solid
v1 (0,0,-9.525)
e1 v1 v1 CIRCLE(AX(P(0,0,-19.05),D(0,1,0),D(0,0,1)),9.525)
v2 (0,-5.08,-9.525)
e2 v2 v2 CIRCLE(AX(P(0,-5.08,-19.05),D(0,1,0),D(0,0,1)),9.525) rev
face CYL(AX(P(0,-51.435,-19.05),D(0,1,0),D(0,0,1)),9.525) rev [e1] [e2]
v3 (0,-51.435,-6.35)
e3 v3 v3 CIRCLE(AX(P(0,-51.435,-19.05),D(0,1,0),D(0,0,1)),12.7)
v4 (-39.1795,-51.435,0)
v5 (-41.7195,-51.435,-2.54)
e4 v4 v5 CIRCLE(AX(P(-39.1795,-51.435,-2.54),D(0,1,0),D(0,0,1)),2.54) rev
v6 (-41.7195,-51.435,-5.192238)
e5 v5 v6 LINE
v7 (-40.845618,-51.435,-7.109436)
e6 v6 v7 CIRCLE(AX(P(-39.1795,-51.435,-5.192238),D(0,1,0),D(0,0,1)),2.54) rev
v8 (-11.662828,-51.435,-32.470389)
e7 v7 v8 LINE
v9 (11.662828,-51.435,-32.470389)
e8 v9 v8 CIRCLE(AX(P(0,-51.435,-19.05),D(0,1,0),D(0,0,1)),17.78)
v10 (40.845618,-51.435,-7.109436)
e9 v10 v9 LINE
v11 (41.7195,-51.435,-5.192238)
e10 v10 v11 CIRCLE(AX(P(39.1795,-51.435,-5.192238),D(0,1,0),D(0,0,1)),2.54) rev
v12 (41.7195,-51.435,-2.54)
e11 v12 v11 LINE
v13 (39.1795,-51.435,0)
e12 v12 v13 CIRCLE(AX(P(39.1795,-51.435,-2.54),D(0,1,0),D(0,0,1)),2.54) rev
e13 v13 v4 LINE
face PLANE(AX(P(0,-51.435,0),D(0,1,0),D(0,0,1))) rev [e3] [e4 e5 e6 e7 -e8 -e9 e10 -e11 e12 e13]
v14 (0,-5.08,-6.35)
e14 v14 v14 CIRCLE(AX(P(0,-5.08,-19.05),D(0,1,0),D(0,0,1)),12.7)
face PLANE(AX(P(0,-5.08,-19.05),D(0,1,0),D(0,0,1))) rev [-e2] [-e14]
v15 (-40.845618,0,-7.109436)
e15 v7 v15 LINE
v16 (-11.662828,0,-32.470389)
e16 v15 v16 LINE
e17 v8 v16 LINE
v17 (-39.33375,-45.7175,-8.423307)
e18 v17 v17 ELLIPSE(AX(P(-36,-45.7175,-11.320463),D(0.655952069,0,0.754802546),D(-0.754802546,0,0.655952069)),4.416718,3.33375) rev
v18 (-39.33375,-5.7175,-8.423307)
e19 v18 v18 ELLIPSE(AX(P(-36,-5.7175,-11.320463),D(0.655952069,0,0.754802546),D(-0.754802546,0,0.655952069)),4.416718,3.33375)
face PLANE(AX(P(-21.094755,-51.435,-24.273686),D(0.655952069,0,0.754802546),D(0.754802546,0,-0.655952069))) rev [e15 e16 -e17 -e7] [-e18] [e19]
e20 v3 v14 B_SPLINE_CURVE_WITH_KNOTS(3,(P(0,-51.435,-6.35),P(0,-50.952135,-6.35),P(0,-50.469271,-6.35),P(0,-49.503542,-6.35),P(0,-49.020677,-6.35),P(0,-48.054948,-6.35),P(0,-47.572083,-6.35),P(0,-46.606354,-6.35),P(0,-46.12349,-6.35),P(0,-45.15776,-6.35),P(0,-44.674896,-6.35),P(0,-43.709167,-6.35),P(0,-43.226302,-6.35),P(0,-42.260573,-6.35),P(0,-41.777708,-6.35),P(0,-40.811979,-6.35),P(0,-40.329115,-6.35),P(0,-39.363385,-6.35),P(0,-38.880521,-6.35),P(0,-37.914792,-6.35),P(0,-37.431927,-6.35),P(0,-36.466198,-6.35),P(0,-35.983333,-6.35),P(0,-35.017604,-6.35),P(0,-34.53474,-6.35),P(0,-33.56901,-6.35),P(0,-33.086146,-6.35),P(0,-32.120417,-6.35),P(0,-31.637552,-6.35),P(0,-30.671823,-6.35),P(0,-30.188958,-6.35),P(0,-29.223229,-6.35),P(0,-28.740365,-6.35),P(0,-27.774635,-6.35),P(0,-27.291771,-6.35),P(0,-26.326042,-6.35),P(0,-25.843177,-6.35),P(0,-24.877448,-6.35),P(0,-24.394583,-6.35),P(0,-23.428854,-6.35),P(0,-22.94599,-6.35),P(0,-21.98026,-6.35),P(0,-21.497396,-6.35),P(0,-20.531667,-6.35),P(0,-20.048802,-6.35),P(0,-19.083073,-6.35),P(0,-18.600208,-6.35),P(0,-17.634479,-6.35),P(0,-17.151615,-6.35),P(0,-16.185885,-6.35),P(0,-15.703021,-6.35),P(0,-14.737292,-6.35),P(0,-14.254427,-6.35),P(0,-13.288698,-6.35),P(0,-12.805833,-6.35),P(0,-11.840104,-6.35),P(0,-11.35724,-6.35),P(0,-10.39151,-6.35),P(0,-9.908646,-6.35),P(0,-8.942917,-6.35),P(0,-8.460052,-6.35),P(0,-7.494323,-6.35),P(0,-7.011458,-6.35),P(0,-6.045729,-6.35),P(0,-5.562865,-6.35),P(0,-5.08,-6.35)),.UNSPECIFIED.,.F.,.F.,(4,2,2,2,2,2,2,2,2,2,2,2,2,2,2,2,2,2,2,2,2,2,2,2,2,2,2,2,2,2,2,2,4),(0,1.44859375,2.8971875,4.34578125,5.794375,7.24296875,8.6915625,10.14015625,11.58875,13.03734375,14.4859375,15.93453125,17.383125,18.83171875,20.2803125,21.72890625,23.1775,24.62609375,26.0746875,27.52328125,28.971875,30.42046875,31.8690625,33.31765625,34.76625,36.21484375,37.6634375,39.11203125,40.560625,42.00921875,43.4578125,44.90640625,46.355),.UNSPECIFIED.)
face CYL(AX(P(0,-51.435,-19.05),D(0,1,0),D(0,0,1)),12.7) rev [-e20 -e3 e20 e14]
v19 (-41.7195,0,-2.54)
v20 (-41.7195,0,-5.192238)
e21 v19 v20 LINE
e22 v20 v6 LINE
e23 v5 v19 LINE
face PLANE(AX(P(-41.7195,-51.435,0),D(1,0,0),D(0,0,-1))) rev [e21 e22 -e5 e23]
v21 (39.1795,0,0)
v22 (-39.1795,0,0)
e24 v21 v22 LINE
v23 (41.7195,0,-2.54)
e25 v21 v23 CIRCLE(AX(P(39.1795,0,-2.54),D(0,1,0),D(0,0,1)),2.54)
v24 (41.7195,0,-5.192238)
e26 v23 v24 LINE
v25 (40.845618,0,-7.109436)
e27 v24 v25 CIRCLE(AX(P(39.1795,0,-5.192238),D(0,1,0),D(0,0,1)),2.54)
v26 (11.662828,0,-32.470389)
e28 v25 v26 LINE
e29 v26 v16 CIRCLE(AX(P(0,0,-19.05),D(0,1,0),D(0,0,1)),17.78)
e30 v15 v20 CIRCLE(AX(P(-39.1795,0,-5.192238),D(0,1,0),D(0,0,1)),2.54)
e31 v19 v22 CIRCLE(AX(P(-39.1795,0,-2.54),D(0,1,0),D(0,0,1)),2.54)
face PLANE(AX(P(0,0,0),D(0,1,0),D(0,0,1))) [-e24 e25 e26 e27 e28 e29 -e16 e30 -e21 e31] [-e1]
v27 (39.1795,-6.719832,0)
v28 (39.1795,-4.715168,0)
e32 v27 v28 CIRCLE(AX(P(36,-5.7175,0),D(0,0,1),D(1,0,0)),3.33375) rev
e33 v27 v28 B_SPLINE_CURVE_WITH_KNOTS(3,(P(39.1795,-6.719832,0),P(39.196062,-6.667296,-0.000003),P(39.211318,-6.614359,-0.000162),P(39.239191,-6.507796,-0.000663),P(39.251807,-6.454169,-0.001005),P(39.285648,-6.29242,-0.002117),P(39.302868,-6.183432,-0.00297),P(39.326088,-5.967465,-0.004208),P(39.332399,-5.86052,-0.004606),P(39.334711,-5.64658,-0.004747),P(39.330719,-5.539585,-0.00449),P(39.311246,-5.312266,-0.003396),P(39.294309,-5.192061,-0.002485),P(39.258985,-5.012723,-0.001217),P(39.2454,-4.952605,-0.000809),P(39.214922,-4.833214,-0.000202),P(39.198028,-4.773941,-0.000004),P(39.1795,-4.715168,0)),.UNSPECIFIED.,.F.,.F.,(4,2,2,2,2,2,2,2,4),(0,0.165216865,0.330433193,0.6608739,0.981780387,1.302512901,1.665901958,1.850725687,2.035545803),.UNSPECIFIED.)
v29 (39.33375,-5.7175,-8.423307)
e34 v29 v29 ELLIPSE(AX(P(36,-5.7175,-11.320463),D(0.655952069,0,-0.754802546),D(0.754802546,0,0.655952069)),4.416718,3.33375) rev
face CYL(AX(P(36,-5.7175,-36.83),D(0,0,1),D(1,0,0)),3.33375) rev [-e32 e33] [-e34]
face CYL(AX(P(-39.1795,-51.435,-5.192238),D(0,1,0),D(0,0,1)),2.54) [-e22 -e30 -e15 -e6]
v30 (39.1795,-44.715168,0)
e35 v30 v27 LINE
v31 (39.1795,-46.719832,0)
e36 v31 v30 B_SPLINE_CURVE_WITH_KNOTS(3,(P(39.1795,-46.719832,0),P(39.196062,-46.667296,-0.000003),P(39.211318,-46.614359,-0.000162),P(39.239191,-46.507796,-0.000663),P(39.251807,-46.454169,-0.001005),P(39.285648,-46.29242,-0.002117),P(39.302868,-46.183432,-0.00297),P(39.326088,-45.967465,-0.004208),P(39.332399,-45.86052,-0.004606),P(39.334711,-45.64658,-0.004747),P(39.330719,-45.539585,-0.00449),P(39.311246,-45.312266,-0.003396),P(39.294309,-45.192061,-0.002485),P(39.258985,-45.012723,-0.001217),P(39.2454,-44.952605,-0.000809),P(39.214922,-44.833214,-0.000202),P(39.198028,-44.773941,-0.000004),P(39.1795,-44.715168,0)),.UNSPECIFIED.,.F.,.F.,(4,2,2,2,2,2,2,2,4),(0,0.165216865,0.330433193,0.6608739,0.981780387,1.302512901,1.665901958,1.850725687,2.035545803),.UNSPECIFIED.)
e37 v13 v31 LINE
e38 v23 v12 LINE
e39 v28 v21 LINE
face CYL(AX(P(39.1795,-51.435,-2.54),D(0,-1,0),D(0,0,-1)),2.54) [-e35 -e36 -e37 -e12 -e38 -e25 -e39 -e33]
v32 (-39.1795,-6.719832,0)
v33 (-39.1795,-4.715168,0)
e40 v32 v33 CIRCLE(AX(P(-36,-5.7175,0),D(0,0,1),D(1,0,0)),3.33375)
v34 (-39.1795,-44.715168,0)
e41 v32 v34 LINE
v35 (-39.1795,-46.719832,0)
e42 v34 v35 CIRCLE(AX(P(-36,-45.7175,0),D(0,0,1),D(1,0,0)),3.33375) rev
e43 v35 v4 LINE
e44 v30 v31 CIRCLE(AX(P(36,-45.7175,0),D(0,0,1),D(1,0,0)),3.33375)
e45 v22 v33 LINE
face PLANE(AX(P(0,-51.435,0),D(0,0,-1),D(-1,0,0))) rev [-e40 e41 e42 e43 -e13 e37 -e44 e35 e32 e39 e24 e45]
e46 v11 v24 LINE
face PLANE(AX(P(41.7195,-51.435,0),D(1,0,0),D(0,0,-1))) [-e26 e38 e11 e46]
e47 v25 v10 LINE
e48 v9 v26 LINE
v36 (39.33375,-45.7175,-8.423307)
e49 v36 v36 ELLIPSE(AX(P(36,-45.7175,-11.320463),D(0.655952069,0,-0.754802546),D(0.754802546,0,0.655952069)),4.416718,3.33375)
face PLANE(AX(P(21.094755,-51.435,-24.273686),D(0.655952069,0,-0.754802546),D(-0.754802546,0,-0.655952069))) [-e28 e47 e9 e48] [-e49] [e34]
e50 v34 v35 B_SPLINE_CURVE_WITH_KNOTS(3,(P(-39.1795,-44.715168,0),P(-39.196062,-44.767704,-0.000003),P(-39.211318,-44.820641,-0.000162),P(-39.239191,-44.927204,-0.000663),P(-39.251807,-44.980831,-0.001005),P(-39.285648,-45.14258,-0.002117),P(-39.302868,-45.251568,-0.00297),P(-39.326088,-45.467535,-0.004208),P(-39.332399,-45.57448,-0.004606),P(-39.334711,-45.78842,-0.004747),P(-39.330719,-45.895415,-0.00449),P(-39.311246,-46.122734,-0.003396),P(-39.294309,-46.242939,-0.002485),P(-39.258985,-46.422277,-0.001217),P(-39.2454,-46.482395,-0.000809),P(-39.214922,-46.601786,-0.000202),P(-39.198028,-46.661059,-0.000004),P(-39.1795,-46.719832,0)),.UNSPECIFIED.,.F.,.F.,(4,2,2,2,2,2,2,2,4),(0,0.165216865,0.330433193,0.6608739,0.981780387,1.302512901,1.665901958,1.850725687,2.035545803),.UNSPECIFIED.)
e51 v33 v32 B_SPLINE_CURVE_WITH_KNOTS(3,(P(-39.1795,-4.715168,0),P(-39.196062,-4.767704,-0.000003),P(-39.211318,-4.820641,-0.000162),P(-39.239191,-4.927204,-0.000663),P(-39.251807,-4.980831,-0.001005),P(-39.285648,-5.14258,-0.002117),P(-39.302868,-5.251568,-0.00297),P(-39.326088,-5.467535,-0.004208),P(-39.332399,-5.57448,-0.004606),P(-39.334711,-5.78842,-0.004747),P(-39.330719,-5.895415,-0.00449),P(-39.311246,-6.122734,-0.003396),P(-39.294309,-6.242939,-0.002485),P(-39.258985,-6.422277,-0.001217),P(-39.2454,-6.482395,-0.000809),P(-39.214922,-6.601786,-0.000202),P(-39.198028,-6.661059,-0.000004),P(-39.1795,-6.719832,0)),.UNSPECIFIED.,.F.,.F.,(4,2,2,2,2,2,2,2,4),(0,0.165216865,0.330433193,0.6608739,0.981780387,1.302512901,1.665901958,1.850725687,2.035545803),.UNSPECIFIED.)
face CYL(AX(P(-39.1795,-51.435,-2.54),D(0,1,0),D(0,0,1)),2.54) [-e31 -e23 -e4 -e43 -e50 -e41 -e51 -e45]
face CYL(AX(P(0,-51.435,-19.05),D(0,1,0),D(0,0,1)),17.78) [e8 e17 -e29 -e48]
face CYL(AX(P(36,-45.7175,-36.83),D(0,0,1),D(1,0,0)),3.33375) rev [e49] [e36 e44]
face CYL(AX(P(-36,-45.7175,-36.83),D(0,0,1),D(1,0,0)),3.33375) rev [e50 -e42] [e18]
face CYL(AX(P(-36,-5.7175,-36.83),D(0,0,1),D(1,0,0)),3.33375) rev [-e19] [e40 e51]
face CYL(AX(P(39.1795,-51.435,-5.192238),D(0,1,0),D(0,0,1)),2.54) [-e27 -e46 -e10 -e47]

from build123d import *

# Parameters (mm, degrees)
CROQUIS2_R              = 12.7
CROQUIS2_R_2            = 9.525
SALIENTE_EXTRUIR1_DEPTH = 51.435
CORTAR_EXTRUIR1_START   = -5.08
CROQUIS3_R              = 12.7
CORTAR_EXTRUIR1_DEPTH   = 71.699448436
CROQUIS4_R              = 3.33375
SALIENTE_EXTRUIR3_DEPTH = 6.35
CROQUIS4_2_R            = 3.33375
CORTAR_EXTRUIR3_DEPTH   = 76.779448436
REDONDEO3_R             = 2.54


with BuildPart() as part:
    # Croquis2 → Saliente-Extruir1 (new body)
    # profile 1 of 2: a face of its own
    with BuildSketch(Plane(origin=(0, 0, 0), x_dir=(1, 0, 0), z_dir=(0, 1, 0))):
        with BuildLine():
            Line((41.7195, 6.35), (11.662827783, 32.470389268))
            ThreePointArc((11.662827783, 32.470389268), (6.225507161, 35.70447269), (0, 36.83))
            ThreePointArc((0, 36.83), (-6.225507161, 35.70447269), (-11.662827783, 32.470389268))
            Line((-11.662827783, 32.470389268), (-41.7195, 6.35))
            Line((-41.7195, 6.35), (-41.7195, 0))
            Line((-41.7195, 0), (41.7195, 0))
            Line((41.7195, 0), (41.7195, 6.35))
        make_face()
        with Locations((0, 19.05)):
            Circle(CROQUIS2_R, mode=Mode.SUBTRACT)
    # profile 2 of 2: a face of its own
    with BuildSketch(Plane(origin=(0, 0, 0), x_dir=(1, 0, 0), z_dir=(0, 1, 0))):
        with Locations((0, 19.05)):
            Circle(CROQUIS2_R)
        with Locations(Location((0, 19.05, 0), (0, 0, 270))):
            Circle(CROQUIS2_R_2, mode=Mode.SUBTRACT)
    extrude(amount=-SALIENTE_EXTRUIR1_DEPTH)

    # Croquis3 → Cortar-Extruir1 (cut, through all)
    with BuildSketch(Plane(origin=(0, 0, 0), x_dir=(1, 0, 0), z_dir=(0, 1, 0)).offset(CORTAR_EXTRUIR1_START)):
        with Locations(Location((0, 19.05, 0), (0, 0, 270))):
            Circle(CROQUIS3_R)
    extrude(amount=-CORTAR_EXTRUIR1_DEPTH, mode=Mode.SUBTRACT)

    # Croquis4 → Saliente-Extruir3 (add)
    with BuildSketch(Plane.XY):
        with Locations((-36.000000009, -5.717499995)):
            Circle(CROQUIS4_R)
        with Locations((36.000000009, -5.717499995)):
            Circle(CROQUIS4_R)
        with Locations((36.000000009, -45.717500005)):
            Circle(CROQUIS4_R)
        with Locations((-36.000000009, -45.717500005)):
            Circle(CROQUIS4_R)
    extrude(amount=-SALIENTE_EXTRUIR3_DEPTH)

    # Croquis4<2> → Cortar-Extruir3 (cut, through all)
    with BuildSketch(Plane.XY):
        with Locations((-36.000000009, -5.717499995)):
            Circle(CROQUIS4_2_R)
        with Locations((36.000000009, -5.717499995)):
            Circle(CROQUIS4_2_R)
        with Locations((36.000000009, -45.717500005)):
            Circle(CROQUIS4_2_R)
        with Locations((-36.000000009, -45.717500005)):
            Circle(CROQUIS4_2_R)
    extrude(amount=-CORTAR_EXTRUIR3_DEPTH, mode=Mode.SUBTRACT)

    # Redondeo3
    # the kernel refuses this fillet: 2.54 mm, written as the material it takes off along each edge
    with BuildSketch(Plane(origin=(41.7195, 2.894405132, -6.35), x_dir=(-0.7548025459958689, 0, -0.6559520687963062), z_dir=(0, -1, 0))) as redondeo3_piece_1:
        with BuildLine():
            CenterArc((REDONDEO3_R * 0.455811831887, -REDONDEO3_R), REDONDEO3_R, 90, 49.008119667)
            Line((-REDONDEO3_R * 0.298990714108, -REDONDEO3_R * 0.344047931204), (0, 0))
            Line((0, 0), (REDONDEO3_R * 0.455811831887, 0))
        make_face()
    extrude(amount=57.223810265, mode=Mode.SUBTRACT)
    with BuildSketch(Plane(origin=(41.7195, 6.35, 0), x_dir=(0, 0, -1), z_dir=(0, -1, 0)), Plane(origin=(-41.7195, 6.35, 0), x_dir=(1, 0, 0), z_dir=(0, -1, 0))) as redondeo3_piece_2:
        with BuildLine():
            CenterArc((REDONDEO3_R, -REDONDEO3_R), REDONDEO3_R, 90, 90)
            Line((0, -REDONDEO3_R), (0, 0))
            Line((0, 0), (REDONDEO3_R, 0))
        make_face()
    extrude(amount=64.135, mode=Mode.SUBTRACT)
    with BuildSketch(Plane(origin=(-41.7195, 2.894405132, -6.35), x_dir=(0.7548025459958687, 0, -0.6559520687963067), z_dir=(0, -1, 0))) as redondeo3_piece_3:
        with BuildLine():
            CenterArc((REDONDEO3_R * 0.455811831887, REDONDEO3_R), REDONDEO3_R, 220.991880333, 49.008119667)
            Line((-REDONDEO3_R * 0.298990714108, REDONDEO3_R * 0.344047931204), (0, 0))
            Line((0, 0), (REDONDEO3_R * 0.455811831887, 0))
        make_face()
    extrude(amount=57.223810265, mode=Mode.SUBTRACT)


solid = part.part
